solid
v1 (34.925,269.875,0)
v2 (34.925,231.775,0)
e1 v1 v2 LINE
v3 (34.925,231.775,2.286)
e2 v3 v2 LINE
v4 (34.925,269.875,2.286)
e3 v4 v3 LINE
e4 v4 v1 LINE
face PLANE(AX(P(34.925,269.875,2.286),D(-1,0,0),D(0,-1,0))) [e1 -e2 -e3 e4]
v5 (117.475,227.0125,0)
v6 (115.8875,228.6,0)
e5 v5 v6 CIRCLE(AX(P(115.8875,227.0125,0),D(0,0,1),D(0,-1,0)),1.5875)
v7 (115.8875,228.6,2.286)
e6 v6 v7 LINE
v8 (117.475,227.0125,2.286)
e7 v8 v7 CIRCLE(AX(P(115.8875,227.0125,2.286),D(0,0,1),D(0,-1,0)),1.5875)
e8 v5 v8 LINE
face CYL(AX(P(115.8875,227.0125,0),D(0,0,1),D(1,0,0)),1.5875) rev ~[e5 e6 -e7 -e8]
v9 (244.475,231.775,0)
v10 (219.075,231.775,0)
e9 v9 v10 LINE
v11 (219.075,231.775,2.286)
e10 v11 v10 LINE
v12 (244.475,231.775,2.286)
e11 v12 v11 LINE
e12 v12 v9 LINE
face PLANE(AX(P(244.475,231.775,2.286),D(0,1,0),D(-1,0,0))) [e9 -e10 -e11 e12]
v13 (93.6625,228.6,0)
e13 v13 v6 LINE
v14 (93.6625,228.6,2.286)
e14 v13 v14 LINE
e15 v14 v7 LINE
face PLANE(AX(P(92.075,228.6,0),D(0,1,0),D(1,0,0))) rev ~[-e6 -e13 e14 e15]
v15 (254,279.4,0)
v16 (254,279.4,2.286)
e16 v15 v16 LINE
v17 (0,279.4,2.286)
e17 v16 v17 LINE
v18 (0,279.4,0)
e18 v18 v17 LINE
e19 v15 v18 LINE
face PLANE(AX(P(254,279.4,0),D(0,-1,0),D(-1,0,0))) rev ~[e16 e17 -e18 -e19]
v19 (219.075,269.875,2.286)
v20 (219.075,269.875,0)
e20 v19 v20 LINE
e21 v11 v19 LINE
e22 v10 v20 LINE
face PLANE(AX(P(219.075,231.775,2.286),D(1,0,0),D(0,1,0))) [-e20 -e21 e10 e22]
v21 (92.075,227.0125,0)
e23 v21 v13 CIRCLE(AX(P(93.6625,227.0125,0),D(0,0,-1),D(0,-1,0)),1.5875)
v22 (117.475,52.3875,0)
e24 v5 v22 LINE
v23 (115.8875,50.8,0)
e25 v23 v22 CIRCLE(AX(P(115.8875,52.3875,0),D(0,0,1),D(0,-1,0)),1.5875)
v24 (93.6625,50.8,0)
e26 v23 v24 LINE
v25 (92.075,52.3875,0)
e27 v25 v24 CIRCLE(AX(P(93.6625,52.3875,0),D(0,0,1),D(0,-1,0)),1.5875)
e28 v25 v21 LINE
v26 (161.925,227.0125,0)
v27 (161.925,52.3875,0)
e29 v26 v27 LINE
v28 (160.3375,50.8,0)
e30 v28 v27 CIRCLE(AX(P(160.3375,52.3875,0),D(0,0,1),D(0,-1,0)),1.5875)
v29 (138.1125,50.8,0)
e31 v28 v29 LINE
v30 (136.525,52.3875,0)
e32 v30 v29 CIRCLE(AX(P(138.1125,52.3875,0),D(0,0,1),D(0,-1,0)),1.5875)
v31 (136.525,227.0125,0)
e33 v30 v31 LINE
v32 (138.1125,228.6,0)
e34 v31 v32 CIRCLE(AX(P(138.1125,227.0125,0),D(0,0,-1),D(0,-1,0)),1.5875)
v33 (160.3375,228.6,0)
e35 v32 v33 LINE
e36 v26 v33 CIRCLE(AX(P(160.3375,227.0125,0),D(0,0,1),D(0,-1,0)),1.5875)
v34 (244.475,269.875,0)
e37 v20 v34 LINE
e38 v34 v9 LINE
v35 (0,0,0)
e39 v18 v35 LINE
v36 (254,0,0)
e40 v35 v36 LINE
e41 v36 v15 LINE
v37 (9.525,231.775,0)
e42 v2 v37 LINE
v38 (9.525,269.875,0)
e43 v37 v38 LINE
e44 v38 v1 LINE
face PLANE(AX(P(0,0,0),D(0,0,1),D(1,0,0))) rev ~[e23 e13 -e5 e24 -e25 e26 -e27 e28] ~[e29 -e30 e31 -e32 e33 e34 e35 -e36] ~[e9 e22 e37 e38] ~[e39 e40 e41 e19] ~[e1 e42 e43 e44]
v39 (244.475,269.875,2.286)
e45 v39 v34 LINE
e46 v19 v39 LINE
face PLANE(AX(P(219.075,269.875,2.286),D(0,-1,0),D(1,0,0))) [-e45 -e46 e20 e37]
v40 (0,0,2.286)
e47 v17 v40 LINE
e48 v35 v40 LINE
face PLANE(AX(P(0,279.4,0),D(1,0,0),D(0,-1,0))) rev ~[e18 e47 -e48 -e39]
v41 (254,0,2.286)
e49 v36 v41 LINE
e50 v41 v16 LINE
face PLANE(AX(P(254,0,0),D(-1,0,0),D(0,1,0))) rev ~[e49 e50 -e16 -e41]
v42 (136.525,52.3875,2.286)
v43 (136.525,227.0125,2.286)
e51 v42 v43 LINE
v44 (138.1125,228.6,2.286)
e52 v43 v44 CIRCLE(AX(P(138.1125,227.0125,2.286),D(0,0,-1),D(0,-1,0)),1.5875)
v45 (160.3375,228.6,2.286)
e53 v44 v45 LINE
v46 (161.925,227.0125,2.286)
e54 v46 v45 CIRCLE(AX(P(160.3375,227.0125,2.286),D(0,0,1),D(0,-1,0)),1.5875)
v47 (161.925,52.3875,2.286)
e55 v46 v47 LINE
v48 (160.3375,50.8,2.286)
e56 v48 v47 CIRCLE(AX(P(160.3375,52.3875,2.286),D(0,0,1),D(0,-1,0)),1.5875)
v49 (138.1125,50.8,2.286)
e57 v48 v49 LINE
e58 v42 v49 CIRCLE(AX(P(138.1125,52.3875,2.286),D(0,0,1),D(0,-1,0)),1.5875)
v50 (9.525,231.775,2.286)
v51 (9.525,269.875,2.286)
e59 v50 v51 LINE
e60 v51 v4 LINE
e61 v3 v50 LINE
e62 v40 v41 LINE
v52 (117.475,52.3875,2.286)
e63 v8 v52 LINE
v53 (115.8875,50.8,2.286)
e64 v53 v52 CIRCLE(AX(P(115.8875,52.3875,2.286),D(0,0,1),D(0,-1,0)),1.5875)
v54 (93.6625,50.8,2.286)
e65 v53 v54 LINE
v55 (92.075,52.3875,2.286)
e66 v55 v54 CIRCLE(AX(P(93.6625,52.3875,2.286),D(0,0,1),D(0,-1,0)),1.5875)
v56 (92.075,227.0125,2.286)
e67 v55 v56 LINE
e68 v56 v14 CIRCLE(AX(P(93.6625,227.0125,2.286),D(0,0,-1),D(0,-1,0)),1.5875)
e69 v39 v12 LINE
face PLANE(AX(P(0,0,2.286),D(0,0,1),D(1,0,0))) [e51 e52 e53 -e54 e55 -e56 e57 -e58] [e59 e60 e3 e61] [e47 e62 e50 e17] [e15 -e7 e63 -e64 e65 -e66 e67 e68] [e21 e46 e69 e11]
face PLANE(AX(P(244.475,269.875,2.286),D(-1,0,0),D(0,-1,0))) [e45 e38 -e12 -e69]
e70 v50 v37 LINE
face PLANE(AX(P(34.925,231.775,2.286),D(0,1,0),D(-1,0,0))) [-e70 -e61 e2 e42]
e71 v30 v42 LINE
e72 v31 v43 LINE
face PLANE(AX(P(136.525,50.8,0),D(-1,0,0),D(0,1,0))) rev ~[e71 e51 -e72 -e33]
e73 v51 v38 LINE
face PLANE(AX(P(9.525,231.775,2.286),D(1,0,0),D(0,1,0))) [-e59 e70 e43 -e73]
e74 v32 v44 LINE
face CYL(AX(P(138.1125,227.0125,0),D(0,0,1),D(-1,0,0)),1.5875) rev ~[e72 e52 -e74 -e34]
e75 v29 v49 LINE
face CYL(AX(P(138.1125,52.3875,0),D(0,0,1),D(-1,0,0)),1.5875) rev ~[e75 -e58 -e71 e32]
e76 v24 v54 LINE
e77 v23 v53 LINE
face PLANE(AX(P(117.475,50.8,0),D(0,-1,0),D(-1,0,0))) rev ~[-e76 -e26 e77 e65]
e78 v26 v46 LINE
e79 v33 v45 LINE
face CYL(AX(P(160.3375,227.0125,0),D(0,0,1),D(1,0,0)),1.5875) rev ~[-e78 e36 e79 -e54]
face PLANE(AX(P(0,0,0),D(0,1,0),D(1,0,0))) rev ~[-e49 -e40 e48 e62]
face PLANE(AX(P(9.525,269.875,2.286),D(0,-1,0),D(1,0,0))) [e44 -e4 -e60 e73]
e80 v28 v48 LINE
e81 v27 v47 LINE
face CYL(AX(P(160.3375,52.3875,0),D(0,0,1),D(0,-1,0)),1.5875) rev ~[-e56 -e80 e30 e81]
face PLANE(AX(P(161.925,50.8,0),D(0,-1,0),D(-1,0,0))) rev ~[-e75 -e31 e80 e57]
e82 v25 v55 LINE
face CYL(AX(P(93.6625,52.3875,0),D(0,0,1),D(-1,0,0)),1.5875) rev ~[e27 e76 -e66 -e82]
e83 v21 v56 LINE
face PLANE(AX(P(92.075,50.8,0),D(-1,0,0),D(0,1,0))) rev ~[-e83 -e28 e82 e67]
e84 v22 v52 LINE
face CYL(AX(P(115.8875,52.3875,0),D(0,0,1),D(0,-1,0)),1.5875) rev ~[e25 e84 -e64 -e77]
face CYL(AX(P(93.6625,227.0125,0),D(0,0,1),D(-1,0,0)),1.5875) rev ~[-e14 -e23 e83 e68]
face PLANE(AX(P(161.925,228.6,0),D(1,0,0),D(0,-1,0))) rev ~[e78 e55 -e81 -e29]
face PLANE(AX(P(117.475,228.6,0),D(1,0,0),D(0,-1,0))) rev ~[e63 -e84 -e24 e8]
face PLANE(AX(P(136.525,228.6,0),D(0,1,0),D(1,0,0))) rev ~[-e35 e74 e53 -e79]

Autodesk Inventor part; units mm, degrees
ref_plane "YZ Plane" through (0, 0, 0) normal (1, 0, 0) x (0, 1, 0)
ref_plane "XZ Plane" through (0, 0, 0) normal (0, 1, 0) x (-1, 0, 0)
ref_plane "XY Plane" through (0, 0, 0) normal (0, 0, 1) x (1, 0, 0)
sketch "Sketch1" plane through (0, 0, 0) normal (0, 0, 1) x (1, 0, 0)
  line L0 (0, 0) -> (254, 0)
  line L1 (254, 0) -> (254, 279.4)
  line L2 (254, 279.4) -> (0, 279.4)
  line L3 (0, 279.4) -> (0, 0)
  line L4 (92.075, 228.6) -> (117.475, 228.6)
  line L5 (117.475, 228.6) -> (117.475, 50.8)
  line L6 (117.475, 50.8) -> (92.075, 50.8)
  line L7 (92.075, 50.8) -> (92.075, 228.6)
  line L8 (136.525, 228.6) -> (161.925, 228.6)
  line L9 (161.925, 228.6) -> (161.925, 50.8)
  line L10 (161.925, 50.8) -> (136.525, 50.8)
  line L11 (136.525, 50.8) -> (136.525, 228.6)
  line L12 (117.475, 228.6) -> (136.525, 228.6)
  point P0 (127, 228.6)
  point P1 (127, 279.4)
  dimension "d0" = 254
  dimension "d1" = 279.4
  dimension "d2" = 19.05
  dimension "d3" = 25.4
  dimension "d4" = 25.4
  dimension "d5" = 50.8
  dimension "d6" = 50.8
extrude "Extrusion1" add sketch "Sketch1" along normal blind 2.286
fillet "Fillet1" radius 1.5875 8 edges at (92.075, 50.8, 1.143) (117.475, 50.8, 1.143) (136.525, 50.8, 1.143) (161.925, 50.8, 1.143) (161.925, 228.6, 1.143) (136.525, 228.6, 1.143) (117.475, 228.6, 1.143) (92.075, 228.6, 1.143)
sketch "Sketch2" plane through (0, 0, 2.286) normal (0, 0, 1) x (1, 0, 0)
  line L0 (9.525, 269.875) -> (34.925, 269.875)
  line L1 (34.925, 269.875) -> (34.925, 231.775)
  line L2 (34.925, 231.775) -> (9.525, 231.775)
  line L3 (9.525, 231.775) -> (9.525, 269.875)
  line L4 (219.075, 269.875) -> (244.475, 269.875)
  line L5 (244.475, 269.875) -> (244.475, 231.775)
  line L6 (244.475, 231.775) -> (219.075, 231.775)
  line L7 (219.075, 231.775) -> (219.075, 269.875)
  line L8 (0, 279.4) -> (0, 0) projected
  line L9 (254, 0) -> (254, 279.4) projected
  line L10 (254, 279.4) -> (0, 279.4) projected
  dimension "d10" = 9.525
  dimension "d11" = 9.525
  dimension "d12" = 9.525
  dimension "d13" = 25.4
  dimension "d14" = 38.1
extrude "Extrusion2" cut sketch "Sketch2" against normal through all
equation "\"d4\" = d3"
equation "\"d11\" = d10"
properties part number "Interior Frame"
